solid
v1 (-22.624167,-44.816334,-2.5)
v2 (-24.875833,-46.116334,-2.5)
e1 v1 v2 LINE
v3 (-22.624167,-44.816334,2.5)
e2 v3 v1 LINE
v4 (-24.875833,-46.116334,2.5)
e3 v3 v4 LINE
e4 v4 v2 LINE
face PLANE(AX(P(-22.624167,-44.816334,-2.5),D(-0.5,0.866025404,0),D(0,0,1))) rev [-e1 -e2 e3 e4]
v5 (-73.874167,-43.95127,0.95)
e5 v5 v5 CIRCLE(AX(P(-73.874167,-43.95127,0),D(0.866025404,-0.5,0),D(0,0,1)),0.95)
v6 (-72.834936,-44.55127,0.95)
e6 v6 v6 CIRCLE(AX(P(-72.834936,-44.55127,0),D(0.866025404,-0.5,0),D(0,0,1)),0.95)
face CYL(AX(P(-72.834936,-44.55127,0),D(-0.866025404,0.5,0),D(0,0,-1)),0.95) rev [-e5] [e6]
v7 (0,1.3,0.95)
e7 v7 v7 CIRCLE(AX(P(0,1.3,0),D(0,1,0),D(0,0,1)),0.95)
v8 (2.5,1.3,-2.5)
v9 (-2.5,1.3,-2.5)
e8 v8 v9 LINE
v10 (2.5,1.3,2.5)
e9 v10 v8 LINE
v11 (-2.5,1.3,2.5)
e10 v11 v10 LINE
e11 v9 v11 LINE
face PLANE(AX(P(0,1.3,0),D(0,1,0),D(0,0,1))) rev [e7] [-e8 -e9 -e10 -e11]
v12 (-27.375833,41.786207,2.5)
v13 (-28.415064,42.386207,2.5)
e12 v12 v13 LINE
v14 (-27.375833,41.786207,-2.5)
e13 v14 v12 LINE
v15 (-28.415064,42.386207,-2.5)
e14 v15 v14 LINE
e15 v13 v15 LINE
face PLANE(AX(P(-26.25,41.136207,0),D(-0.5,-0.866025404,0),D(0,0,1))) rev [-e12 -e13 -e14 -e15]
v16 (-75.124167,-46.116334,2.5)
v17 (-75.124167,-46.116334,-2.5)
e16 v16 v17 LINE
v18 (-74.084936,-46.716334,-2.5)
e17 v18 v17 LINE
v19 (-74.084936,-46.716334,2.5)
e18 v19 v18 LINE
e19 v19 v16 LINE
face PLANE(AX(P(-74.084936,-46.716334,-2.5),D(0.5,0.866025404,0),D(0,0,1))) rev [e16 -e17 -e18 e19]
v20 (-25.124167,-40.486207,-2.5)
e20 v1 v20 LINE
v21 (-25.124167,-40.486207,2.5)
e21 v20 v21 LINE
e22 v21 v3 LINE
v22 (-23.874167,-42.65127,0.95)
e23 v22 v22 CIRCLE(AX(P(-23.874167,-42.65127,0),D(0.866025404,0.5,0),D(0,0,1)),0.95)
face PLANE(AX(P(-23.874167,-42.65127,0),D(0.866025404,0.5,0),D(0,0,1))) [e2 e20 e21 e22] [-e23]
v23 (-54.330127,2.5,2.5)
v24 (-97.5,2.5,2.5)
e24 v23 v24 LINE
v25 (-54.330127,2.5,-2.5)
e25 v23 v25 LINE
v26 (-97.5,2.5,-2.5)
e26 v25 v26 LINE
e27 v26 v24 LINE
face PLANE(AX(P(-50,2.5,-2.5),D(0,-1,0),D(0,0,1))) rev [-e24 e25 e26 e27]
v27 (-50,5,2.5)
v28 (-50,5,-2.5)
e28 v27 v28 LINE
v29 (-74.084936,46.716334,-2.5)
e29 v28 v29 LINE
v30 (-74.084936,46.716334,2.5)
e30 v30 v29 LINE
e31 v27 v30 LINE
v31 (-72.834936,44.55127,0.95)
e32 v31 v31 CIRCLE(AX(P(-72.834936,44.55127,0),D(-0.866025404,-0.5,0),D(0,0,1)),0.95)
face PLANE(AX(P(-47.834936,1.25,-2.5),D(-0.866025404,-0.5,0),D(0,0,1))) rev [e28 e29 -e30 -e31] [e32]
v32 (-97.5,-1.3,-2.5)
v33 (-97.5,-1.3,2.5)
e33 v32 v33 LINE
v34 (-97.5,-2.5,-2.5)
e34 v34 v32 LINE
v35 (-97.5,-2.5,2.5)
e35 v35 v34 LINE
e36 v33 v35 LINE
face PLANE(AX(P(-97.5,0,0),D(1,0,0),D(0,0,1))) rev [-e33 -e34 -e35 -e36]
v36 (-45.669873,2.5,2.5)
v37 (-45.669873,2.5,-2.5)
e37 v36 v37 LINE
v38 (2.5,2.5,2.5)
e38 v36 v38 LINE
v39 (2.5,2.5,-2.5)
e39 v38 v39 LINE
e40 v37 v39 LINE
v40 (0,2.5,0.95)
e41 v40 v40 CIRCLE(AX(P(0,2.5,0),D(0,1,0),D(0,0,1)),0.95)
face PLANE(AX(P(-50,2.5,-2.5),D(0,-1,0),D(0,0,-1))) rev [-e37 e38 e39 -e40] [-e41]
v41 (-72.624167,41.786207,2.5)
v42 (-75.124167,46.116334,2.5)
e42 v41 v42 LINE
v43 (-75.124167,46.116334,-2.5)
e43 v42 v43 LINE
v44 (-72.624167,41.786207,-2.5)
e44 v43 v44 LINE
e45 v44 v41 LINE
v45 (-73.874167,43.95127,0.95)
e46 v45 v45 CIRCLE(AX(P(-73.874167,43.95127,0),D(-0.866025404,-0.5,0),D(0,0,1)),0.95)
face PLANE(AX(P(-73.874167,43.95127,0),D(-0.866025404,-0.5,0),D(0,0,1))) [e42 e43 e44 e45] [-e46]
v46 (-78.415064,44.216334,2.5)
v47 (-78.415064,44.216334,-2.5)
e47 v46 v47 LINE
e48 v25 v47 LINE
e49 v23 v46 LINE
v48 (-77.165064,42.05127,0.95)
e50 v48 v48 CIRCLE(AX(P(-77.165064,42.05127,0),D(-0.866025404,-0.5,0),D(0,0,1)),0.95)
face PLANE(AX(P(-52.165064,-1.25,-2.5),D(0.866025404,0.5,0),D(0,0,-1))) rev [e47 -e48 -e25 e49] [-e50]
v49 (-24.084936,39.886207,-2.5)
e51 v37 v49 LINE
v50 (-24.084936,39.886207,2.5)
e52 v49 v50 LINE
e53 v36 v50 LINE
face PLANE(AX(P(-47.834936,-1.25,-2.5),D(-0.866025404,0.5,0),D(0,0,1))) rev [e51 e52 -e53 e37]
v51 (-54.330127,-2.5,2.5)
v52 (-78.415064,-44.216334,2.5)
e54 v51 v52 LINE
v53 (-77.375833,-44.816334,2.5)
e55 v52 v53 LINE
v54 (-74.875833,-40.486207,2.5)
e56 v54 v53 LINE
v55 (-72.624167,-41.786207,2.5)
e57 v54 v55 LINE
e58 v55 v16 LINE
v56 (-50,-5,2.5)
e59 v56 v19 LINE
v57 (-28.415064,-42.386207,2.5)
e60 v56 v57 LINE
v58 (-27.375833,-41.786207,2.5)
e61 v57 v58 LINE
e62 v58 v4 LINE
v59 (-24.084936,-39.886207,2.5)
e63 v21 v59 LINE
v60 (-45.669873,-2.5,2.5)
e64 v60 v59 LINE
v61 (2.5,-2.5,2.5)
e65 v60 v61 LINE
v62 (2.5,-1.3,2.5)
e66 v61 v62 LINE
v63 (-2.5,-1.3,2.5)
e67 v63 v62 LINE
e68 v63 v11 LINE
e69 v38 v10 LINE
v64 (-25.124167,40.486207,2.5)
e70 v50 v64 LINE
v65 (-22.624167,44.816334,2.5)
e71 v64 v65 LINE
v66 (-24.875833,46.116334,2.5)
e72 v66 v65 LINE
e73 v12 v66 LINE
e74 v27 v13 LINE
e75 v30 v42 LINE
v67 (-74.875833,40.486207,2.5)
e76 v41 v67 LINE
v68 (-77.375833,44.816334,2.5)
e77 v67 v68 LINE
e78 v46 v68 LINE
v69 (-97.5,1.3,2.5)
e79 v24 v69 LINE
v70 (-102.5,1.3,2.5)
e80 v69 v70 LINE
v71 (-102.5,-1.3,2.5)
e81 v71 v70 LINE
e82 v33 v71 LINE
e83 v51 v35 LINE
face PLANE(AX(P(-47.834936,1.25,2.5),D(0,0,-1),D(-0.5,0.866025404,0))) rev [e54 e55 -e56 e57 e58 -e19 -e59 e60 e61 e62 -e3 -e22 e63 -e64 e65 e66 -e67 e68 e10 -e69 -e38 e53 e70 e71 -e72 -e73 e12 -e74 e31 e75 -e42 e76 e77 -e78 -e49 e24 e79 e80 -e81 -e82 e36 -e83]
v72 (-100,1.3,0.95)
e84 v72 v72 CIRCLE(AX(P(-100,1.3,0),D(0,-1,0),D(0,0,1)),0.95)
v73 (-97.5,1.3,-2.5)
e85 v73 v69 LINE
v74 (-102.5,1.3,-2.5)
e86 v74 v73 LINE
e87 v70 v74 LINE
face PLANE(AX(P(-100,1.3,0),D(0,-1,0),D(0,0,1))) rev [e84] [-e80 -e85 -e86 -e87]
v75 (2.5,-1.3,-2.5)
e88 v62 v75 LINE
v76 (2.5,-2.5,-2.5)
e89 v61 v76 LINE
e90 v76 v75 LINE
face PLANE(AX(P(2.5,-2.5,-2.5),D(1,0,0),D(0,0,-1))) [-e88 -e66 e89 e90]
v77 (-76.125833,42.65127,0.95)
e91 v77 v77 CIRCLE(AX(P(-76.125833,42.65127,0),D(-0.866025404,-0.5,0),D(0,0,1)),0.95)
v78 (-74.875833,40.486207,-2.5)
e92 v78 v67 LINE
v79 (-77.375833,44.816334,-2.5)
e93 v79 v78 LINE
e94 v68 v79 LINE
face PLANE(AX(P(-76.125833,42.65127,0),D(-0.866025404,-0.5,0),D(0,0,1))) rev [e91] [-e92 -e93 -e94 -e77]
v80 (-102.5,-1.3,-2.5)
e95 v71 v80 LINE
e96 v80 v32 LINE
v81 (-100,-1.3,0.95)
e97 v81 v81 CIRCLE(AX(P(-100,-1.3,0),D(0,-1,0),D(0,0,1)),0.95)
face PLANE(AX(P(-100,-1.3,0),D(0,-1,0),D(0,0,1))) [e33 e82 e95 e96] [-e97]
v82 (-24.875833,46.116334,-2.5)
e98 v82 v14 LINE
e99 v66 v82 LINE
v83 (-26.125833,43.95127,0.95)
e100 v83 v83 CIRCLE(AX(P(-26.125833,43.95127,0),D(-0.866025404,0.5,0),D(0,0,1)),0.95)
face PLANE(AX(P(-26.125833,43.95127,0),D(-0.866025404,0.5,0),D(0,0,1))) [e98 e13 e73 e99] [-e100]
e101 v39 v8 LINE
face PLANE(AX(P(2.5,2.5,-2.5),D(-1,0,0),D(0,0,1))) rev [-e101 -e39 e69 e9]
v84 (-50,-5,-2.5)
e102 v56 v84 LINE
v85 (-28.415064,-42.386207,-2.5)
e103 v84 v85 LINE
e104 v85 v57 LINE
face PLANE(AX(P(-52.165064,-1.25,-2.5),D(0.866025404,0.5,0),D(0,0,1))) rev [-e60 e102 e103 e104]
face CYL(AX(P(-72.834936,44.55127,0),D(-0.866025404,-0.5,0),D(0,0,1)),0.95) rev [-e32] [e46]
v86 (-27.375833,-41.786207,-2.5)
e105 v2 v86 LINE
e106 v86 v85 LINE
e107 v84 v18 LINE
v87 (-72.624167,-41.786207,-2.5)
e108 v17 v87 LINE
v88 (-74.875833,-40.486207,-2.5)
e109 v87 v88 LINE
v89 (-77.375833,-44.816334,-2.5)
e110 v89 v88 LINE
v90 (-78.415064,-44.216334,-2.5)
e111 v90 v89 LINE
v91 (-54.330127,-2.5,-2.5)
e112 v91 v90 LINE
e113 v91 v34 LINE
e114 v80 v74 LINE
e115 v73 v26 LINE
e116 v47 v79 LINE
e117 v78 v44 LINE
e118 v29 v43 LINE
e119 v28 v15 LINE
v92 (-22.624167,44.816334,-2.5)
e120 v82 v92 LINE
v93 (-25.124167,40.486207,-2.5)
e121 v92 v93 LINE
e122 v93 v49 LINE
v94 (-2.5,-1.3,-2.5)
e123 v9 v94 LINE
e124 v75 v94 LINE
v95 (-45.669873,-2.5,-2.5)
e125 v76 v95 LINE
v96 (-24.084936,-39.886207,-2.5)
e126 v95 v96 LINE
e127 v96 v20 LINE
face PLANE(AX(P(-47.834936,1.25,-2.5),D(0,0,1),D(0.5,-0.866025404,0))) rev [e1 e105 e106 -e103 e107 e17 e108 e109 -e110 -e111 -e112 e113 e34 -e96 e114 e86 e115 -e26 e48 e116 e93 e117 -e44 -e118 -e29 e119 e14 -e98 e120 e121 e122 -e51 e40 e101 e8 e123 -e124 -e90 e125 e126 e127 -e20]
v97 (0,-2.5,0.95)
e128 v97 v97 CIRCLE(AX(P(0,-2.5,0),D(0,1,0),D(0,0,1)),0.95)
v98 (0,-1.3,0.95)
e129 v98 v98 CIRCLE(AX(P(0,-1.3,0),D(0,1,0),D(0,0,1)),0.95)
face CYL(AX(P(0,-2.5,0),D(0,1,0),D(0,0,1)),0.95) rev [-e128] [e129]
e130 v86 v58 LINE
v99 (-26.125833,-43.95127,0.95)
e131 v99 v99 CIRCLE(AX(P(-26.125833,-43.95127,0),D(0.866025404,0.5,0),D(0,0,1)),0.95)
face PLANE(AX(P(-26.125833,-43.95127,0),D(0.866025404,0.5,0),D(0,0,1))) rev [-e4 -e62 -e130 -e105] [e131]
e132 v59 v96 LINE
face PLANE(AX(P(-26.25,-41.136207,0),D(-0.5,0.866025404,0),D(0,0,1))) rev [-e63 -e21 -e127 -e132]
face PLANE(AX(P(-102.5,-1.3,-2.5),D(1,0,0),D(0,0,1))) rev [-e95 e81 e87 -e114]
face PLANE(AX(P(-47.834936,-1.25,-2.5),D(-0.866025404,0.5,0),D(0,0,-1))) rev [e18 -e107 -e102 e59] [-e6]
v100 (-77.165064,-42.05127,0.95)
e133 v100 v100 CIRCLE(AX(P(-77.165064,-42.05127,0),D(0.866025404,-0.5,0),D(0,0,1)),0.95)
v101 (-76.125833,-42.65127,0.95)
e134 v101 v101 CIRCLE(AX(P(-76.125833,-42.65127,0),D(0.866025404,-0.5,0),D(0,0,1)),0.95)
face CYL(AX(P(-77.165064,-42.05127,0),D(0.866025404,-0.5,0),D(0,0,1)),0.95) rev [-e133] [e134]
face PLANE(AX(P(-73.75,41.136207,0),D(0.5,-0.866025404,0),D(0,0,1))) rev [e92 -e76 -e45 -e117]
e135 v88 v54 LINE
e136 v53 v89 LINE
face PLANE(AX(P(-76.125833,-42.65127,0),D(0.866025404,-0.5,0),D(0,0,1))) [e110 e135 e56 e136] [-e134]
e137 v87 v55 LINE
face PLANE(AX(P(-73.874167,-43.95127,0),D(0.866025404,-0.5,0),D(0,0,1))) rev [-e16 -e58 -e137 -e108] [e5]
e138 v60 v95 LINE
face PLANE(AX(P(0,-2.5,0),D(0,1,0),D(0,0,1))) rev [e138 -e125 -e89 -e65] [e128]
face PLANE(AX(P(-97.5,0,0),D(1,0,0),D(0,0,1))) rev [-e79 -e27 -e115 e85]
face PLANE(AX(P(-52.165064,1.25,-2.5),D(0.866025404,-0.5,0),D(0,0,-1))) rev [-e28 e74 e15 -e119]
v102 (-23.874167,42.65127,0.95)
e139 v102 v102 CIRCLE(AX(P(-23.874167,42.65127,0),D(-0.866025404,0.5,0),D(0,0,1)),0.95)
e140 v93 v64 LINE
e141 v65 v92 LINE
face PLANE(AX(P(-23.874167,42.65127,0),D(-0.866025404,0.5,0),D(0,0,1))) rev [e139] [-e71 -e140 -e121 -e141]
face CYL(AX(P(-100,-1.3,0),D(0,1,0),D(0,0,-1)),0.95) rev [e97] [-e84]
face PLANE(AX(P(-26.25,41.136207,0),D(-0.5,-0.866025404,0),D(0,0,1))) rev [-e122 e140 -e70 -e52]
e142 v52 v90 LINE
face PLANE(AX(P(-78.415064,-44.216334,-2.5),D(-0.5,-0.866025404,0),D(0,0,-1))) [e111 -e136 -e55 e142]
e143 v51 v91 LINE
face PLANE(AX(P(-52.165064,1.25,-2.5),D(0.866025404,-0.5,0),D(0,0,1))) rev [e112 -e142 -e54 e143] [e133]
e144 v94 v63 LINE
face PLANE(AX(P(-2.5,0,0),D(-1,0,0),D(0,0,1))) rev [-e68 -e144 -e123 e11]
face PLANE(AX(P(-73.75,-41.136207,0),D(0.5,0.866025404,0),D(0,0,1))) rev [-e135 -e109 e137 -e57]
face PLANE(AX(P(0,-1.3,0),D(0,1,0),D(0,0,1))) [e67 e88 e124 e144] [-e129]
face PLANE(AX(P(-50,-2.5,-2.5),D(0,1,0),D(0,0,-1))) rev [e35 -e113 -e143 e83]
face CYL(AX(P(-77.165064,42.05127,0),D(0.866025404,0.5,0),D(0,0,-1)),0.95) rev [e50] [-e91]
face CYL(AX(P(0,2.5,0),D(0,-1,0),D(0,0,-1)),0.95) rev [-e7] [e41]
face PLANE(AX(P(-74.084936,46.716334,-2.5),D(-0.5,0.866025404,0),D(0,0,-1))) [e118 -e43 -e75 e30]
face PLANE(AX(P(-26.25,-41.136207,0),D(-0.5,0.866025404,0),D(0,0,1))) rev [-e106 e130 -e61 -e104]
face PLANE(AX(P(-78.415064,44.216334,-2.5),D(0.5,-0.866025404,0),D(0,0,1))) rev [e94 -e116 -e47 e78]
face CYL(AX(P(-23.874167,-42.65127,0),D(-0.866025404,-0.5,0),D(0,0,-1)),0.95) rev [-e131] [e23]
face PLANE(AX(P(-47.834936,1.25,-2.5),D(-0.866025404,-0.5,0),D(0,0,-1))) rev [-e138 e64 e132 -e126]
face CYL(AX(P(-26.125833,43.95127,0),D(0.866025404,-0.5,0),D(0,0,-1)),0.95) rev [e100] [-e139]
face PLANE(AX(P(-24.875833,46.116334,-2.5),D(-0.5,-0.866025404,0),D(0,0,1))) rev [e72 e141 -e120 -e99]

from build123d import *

# Parameters (mm, degrees)
SKETCH1_W               = 5
SKETCH1_H               = 5
SKETCH1_R               = 0.95
CENTER_DEPTH            = 1.3
RIGHTSIDE_START         = 1.3
SKETCH1_2_W             = 5
SKETCH1_2_H             = 5
SKETCH1_2_R             = 0.95
RIGHTSIDE_DEPTH         = 1.2
LEFTSIDE_START          = -1.3
SKETCH1_3_W             = 5
SKETCH1_3_H             = 5
SKETCH1_3_R             = 0.95
LEFTSIDE_DEPTH          = 1.2
SKETCH3_W               = 5
SKETCH3_H               = 5
BOSS_EXTRUDE4_DEPTH     = 47.5
CUT_EXTRUDE1_DEPTH      = 5
CIRPATTERN2_COUNT       = 6
CIRPATTERN3_COUNT       = 3
CIRPATTERN4_START       = -44.601270189
CIRPATTERN4_OUTLINE_W   = 5
CIRPATTERN4_OUTLINE_H   = 5
CIRPATTERN4_OUTLINE_R   = 0.95
CIRPATTERN4_DEPTH       = 2.6
CIRPATTERN4_2_OUTLINE_W = 5
CIRPATTERN4_2_OUTLINE_H = 5
CIRPATTERN4_2_OUTLINE_R = 0.95
CIRPATTERN4_2_DEPTH     = 2.6
CIRPATTERN4_START_2     = -1.3
CIRPATTERN4_3_OUTLINE_W = 5
CIRPATTERN4_3_OUTLINE_H = 5
CIRPATTERN4_3_OUTLINE_R = 0.95
CIRPATTERN4_3_DEPTH     = 2.6
SKETCH5_W               = 5
SKETCH5_H               = 2.6
CUT_EXTRUDE2_DEPTH      = 5


# Read off the part's stored shape, not the designer's step: CirPattern4
with BuildPart() as part:
    # Sketch1 → Center (new, symmetric)
    with BuildSketch(Plane(origin=(0, 0, 0), x_dir=(1, 0, 0), z_dir=(0, 1, 0))):
        Rectangle(SKETCH1_W, SKETCH1_H)
        with Locations(Location((0, 0, 0), (0, 0, 270))):
            Circle(SKETCH1_R, mode=Mode.SUBTRACT)
    extrude(amount=CENTER_DEPTH, both=True)

    # Sketch5 → Cut-Extrude2 (cut)
    with BuildSketch(Plane(origin=(2.5, 0, 0), x_dir=(0, 0, -1), z_dir=(1, 0, 0))):
        Rectangle(SKETCH5_W, SKETCH5_H)
    extrude(amount=-CUT_EXTRUDE2_DEPTH, mode=Mode.SUBTRACT)


with BuildPart() as body_2:
    # Sketch1<2> → RightSide (new body)
    with BuildSketch(Plane(origin=(0, 0, 0), x_dir=(1, 0, 0), z_dir=(0, 1, 0)).offset(RIGHTSIDE_START)):
        Rectangle(SKETCH1_2_W, SKETCH1_2_H)
        with Locations(Location((0, 0, 0), (0, 0, 270))):
            Circle(SKETCH1_2_R, mode=Mode.SUBTRACT)
    extrude(amount=RIGHTSIDE_DEPTH)


with BuildPart() as body_3:
    # Sketch1<3> → LeftSide (new body)
    with BuildSketch(Plane(origin=(0, 0, 0), x_dir=(1, 0, 0), z_dir=(0, 1, 0)).offset(LEFTSIDE_START)):
        Rectangle(SKETCH1_3_W, SKETCH1_3_H)
        with Locations(Location((0, 0, 0), (0, 0, 270))):
            Circle(SKETCH1_3_R, mode=Mode.SUBTRACT)
    extrude(amount=-LEFTSIDE_DEPTH)


with BuildPart() as body_4:
    # Sketch3 → Boss-Extrude4 (new body)
    with BuildSketch(Plane.ZY.offset(2.5)):
        Rectangle(SKETCH3_W, SKETCH3_H)
    extrude(amount=BOSS_EXTRUDE4_DEPTH)

    # Sketch4 → Cut-Extrude1 (cut)
    with BuildSketch(Plane.XY.offset(-2.5)):
        Polygon((-50, 0), (-50, -2.5), (-45.669872981, -2.5), align=None)
        Polygon((-50, 2.5), (-50, 0), (-45.669872981, 2.5), align=None)
    extrude(amount=CUT_EXTRUDE1_DEPTH, mode=Mode.SUBTRACT)


with BuildPart() as cirpattern2_1:
    # CirPattern2: pattern copy
    add(body_4.part.rotate(Axis((-50, 0, 0), (0, 0, 1)), 1 * 360 / CIRPATTERN2_COUNT))


with BuildPart() as cirpattern2_2:
    # CirPattern2: pattern copy
    add(body_4.part.rotate(Axis((-50, 0, 0), (0, 0, 1)), 2 * 360 / CIRPATTERN2_COUNT))


with BuildPart() as cirpattern2_3:
    # CirPattern2: pattern copy
    add(body_4.part.rotate(Axis((-50, 0, 0), (0, 0, 1)), 3 * 360 / CIRPATTERN2_COUNT))


with BuildPart() as cirpattern2_4:
    # CirPattern2: pattern copy
    add(body_4.part.rotate(Axis((-50, 0, 0), (0, 0, 1)), 4 * 360 / CIRPATTERN2_COUNT))


with BuildPart() as cirpattern2_5:
    # CirPattern2: pattern copy
    add(body_4.part.rotate(Axis((-50, 0, 0), (0, 0, 1)), 5 * 360 / CIRPATTERN2_COUNT))


with BuildPart() as cirpattern3_1:
    # CirPattern3: pattern copy
    add(body_3.part.rotate(Axis((-50, 0, 0), (0, 0, 1)), 1 * 360 / CIRPATTERN3_COUNT))


with BuildPart() as cirpattern3_2:
    # CirPattern3: pattern copy
    add(body_3.part.rotate(Axis((-50, 0, 0), (0, 0, 1)), 2 * 360 / CIRPATTERN3_COUNT))


with BuildPart() as cirpattern3_3:
    # CirPattern3: pattern copy
    add(body_2.part.rotate(Axis((-50, 0, 0), (0, 0, 1)), 1 * 360 / CIRPATTERN3_COUNT))


with BuildPart() as cirpattern3_4:
    # CirPattern3: pattern copy
    add(body_2.part.rotate(Axis((-50, 0, 0), (0, 0, 1)), 2 * 360 / CIRPATTERN3_COUNT))


with BuildPart() as body_14:
    # CirPattern4 outline → CirPattern4 (new body)
    with BuildSketch(Plane(origin=(0, 0, 0), x_dir=(0.49999999999999767, 0.86602540378444, 0), z_dir=(0.8660254037844399, -0.49999999999999795, 0)).offset(CIRPATTERN4_START)):
        with Locations((25, 0)):
            Rectangle(CIRPATTERN4_OUTLINE_W, CIRPATTERN4_OUTLINE_H)
        with Locations((25, 0)):
            Circle(CIRPATTERN4_OUTLINE_R, mode=Mode.SUBTRACT)
    extrude(amount=CIRPATTERN4_DEPTH)


with BuildPart() as body_15:
    # CirPattern4 2 outline → CirPattern4 2 (new body)
    with BuildSketch(Plane(origin=(0, 0, 0), x_dir=(0.5000000000000098, -0.8660254037844329, 0), z_dir=(0.8660254037844329, 0.50000000000001, 0)).offset(CIRPATTERN4_START)):
        with Locations((25, 0)):
            Rectangle(CIRPATTERN4_2_OUTLINE_W, CIRPATTERN4_2_OUTLINE_H)
        with Locations((25, 0)):
            Circle(CIRPATTERN4_2_OUTLINE_R, mode=Mode.SUBTRACT)
    extrude(amount=CIRPATTERN4_2_DEPTH)


with BuildPart() as body_16:
    # CirPattern4 3 outline → CirPattern4 3 (new body)
    with BuildSketch(Plane(origin=(0, 0, 0), x_dir=(1, 0, 0), z_dir=(0, 1, 0)).offset(CIRPATTERN4_START_2)):
        with Locations((-100, 0)):
            Rectangle(CIRPATTERN4_3_OUTLINE_W, CIRPATTERN4_3_OUTLINE_H)
        with Locations((-100, 0)):
            Circle(CIRPATTERN4_3_OUTLINE_R, mode=Mode.SUBTRACT)
    extrude(amount=CIRPATTERN4_3_DEPTH)


with BuildPart() as cirpattern2_5_1:
    add(cirpattern2_5.part)

    # Combine1: union CirPattern2_3, CirPattern2_4, body 16, CirPattern3_2, CirPattern3_4, body 15, CirPattern2_1, body 3, body 14, body 4, body 2, CirPattern2_2, CirPattern3_1, CirPattern3_3
    add(cirpattern2_3.part)
    add(cirpattern2_4.part)
    add(body_16.part)
    add(cirpattern3_2.part)
    add(cirpattern3_4.part)
    add(body_15.part)
    add(cirpattern2_1.part)
    add(body_3.part)
    add(body_14.part)
    add(body_4.part)
    add(body_2.part)
    add(cirpattern2_2.part)
    add(cirpattern3_1.part)
    add(cirpattern3_3.part)


solid = cirpattern2_5_1.part
